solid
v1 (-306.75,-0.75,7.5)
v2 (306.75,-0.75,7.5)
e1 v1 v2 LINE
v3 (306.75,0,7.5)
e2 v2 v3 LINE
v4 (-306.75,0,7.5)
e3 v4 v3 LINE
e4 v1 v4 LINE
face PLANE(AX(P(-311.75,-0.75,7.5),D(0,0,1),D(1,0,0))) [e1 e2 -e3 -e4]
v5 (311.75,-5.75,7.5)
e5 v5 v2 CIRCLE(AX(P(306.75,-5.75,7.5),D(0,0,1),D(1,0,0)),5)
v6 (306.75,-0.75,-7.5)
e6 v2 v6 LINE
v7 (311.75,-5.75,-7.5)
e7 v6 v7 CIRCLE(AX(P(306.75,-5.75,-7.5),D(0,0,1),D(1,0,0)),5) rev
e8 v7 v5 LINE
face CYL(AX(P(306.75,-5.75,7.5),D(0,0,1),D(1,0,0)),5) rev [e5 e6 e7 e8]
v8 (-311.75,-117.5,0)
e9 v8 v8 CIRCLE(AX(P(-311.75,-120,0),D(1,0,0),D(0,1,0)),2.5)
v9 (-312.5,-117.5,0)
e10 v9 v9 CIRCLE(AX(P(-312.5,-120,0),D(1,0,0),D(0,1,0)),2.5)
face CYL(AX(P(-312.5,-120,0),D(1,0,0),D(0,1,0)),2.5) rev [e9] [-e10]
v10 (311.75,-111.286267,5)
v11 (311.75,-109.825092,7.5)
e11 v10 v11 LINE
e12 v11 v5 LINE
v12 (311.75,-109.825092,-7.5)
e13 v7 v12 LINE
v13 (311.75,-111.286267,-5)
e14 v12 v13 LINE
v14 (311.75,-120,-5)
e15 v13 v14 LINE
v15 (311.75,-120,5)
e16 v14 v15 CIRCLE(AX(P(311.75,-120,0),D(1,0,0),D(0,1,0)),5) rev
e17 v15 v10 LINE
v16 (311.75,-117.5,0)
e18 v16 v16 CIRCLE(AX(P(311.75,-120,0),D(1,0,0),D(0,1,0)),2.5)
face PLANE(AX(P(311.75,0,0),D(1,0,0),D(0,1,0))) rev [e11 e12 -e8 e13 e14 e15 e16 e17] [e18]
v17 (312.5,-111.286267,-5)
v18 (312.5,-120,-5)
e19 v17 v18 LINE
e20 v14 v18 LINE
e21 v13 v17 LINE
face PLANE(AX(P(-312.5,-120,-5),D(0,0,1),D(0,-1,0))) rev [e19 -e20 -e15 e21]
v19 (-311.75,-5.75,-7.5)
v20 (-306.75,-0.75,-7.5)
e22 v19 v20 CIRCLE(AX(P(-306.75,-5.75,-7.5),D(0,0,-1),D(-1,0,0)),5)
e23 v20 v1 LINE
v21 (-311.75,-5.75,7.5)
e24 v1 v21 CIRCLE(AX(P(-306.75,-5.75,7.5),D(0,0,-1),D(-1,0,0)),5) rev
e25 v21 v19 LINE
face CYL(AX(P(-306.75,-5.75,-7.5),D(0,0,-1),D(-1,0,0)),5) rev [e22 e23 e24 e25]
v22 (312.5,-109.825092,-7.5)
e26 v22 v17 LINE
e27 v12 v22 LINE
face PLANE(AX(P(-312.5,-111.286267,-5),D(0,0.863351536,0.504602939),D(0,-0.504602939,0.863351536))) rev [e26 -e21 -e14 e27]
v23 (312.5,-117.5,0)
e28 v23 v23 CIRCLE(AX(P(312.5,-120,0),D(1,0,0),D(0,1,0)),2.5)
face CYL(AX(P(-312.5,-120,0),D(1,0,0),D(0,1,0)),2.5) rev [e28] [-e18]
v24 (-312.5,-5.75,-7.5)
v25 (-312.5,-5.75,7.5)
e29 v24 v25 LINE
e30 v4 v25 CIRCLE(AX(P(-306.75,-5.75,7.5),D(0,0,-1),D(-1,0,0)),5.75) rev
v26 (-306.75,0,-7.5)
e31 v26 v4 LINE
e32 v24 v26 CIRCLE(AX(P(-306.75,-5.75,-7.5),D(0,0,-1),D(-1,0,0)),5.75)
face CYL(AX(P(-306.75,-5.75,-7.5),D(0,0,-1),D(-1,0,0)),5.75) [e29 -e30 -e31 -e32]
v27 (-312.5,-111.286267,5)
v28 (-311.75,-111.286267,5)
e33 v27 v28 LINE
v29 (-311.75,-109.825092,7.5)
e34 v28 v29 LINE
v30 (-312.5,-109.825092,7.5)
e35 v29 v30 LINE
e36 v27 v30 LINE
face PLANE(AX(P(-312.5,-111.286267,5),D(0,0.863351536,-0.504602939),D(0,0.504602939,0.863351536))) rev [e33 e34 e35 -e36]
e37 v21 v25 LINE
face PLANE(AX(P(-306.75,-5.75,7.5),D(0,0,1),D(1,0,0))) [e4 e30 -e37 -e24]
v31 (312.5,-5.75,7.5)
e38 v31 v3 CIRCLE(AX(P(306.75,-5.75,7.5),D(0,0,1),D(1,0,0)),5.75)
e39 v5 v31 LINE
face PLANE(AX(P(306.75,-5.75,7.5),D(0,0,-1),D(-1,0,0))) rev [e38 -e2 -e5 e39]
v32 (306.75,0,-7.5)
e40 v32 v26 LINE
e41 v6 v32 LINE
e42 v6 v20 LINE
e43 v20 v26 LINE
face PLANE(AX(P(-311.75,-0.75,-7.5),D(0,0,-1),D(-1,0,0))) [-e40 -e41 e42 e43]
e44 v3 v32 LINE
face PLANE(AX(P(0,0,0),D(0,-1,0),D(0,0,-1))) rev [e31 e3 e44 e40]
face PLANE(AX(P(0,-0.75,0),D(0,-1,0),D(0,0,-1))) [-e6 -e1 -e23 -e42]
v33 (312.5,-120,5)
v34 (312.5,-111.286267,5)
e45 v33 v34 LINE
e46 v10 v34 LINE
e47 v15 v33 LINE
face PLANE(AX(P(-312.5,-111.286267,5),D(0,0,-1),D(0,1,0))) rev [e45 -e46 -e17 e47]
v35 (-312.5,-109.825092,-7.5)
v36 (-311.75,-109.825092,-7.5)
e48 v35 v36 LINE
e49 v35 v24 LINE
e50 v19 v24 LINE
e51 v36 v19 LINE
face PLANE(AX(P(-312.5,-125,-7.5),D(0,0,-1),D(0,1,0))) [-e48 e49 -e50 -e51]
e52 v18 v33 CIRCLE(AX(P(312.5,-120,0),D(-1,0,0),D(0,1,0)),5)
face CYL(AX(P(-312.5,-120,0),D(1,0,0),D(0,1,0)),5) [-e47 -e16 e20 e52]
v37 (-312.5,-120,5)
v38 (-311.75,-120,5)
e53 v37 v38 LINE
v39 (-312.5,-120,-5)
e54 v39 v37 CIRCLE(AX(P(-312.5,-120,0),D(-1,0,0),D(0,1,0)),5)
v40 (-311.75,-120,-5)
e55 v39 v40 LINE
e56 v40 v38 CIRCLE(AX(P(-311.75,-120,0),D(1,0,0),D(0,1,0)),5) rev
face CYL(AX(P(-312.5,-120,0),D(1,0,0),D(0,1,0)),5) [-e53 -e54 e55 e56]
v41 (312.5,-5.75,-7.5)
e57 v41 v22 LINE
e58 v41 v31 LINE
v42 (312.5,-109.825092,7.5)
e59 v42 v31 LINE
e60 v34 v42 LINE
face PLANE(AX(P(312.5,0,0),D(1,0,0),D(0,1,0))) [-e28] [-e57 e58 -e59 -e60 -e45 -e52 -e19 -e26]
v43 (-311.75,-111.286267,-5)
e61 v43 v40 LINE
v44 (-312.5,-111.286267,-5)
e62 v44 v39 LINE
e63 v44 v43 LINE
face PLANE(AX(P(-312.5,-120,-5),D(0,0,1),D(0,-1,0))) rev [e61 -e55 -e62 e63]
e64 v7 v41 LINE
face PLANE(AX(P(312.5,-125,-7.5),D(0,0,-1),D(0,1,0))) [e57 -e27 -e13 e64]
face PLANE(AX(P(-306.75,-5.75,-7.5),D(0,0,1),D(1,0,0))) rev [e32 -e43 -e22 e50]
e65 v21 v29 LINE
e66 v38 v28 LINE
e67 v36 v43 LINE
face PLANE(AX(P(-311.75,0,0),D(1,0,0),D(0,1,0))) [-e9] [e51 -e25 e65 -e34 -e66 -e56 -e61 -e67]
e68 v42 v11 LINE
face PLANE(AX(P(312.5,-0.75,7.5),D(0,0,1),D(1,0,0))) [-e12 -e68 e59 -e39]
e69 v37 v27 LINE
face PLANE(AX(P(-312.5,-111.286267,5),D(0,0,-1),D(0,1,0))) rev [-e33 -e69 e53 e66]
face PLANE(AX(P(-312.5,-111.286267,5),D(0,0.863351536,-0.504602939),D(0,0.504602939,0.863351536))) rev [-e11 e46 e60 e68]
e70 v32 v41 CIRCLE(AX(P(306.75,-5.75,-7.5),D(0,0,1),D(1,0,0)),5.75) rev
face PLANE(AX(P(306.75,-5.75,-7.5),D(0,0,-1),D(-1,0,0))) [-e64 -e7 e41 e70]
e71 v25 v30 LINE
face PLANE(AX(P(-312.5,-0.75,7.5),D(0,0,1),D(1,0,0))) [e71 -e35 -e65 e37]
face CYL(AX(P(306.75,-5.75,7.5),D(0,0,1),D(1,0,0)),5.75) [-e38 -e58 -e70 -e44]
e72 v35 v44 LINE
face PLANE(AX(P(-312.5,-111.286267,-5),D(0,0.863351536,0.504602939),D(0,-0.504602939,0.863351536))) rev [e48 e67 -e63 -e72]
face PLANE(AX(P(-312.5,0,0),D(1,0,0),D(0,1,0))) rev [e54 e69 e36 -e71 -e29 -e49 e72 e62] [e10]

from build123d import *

# Parameters (mm, degrees)
SKETCH1_W                      = 623.5
SKETCH1_H                      = 15
BASE_FLANGE2_DEPTH             = 0.75
EDGE_FLANGE1_STRIP_W           = 13
EDGE_FLANGE1_STRIP_H           = 0.75
EDGE_FLANGE1_STRIP_CUT_DEPTH   = 15
EDGE_FLANGE1_STRIP_2_W         = 13
EDGE_FLANGE1_STRIP_2_H         = 0.75
EDGE_FLANGE1_STRIP_CUT_2_DEPTH = 15
EDGE_FLANGE1_DEPTH             = 15
EDGE_FLANGE1_BEND_DEPTH        = 15
SKETCH17_R                     = 2.5
CUT_EXTRUDE1_DEPTH             = 638.421563802


# Sheet-metal steps are written as plain solids
with BuildPart() as part:
    # Sketch1 → Base-Flange2 (new body)
    with BuildSketch(Plane(origin=(0, 0, 0), x_dir=(1, 0, 0), z_dir=(0, 1, 0))):
        Rectangle(SKETCH1_W, SKETCH1_H)
    extrude(amount=-BASE_FLANGE2_DEPTH)

    # Edge-Flange1 strip (across the edge) → Edge-Flange1 strip cut (cut)
    with BuildSketch(Plane(origin=(311.75, -0.75, -7.5), x_dir=(-1, 0, 0), z_dir=(0, 0, 1))):
        with Locations((-1.5, -0.375)):
            Rectangle(EDGE_FLANGE1_STRIP_W, EDGE_FLANGE1_STRIP_H)
    extrude(amount=EDGE_FLANGE1_STRIP_CUT_DEPTH, mode=Mode.SUBTRACT)

    # Edge-Flange1 strip 2 (across the edge) → Edge-Flange1 strip cut 2 (cut)
    with BuildSketch(Plane(origin=(-311.75, -0.75, 7.5), x_dir=(1, 0, 0), z_dir=(0, 0, -1))):
        with Locations((-1.5, -0.375)):
            Rectangle(EDGE_FLANGE1_STRIP_2_W, EDGE_FLANGE1_STRIP_2_H)
    extrude(amount=EDGE_FLANGE1_STRIP_CUT_2_DEPTH, mode=Mode.SUBTRACT)

    # Edge-Flange1 section (across the edge) → Edge-Flange1 (add)
    with BuildSketch(Plane(origin=(311.75, -0.75, -7.5), x_dir=(-1, 0, 0), z_dir=(0, 0, 1))):
        with BuildLine():
            Line((-0.75, 5), (-0.75, 124.25))
            Line((-0.75, 124.25), (0, 124.25))
            Line((0, 124.25), (0, 5))
            ThreePointArc((0, 5), (1.464466094, 1.464466094), (5, 0))
            Line((5, 0), (5, -0.75))
            ThreePointArc((5, -0.75), (0.934136008, 0.934136008), (-0.75, 5))
        make_face()
    extrude(amount=EDGE_FLANGE1_DEPTH)

    # Edge-Flange1 section 2 (across the edge) → Edge-Flange1 bend (add)
    with BuildSketch(Plane(origin=(-311.75, -0.75, 7.5), x_dir=(1, 0, 0), z_dir=(0, 0, -1))):
        with BuildLine():
            Line((-0.75, 5), (-0.75, 124.25))
            Line((-0.75, 124.25), (0, 124.25))
            Line((0, 124.25), (0, 5))
            ThreePointArc((0, 5), (1.464466094, 1.464466094), (5, 0))
            Line((5, 0), (5, -0.75))
            ThreePointArc((5, -0.75), (0.934136008, 0.934136008), (-0.75, 5))
        make_face()
    extrude(amount=EDGE_FLANGE1_BEND_DEPTH)

    # Sketch17 → Cut-Extrude1 (cut, through all)
    with BuildSketch(Plane(origin=(312.5, 0, 0), x_dir=(0, 0, -1), z_dir=(1, 0, 0))):
        with Locations(Location((0, -120, 0), (0, 0, 90))):
            Circle(SKETCH17_R)
        with BuildLine():
            Line((-5, -111.286267084), (-5, -120))
            ThreePointArc((-5, -120), (0, -125), (5, -120))
            Line((5, -120), (5, -111.286267084))
            Line((5, -111.286267084), (9.961082892, -108.386663731))
            Line((9.961082892, -108.386663731), (9.961082892, -134.171353008))
            Line((9.961082892, -134.171353008), (-9.961082892, -134.171353008))
            Line((-9.961082892, -134.171353008), (-9.961082892, -108.386663731))
            Line((-9.961082892, -108.386663731), (-5, -111.286267084))
        make_face()
    extrude(amount=-CUT_EXTRUDE1_DEPTH, mode=Mode.SUBTRACT)


solid = part.part
